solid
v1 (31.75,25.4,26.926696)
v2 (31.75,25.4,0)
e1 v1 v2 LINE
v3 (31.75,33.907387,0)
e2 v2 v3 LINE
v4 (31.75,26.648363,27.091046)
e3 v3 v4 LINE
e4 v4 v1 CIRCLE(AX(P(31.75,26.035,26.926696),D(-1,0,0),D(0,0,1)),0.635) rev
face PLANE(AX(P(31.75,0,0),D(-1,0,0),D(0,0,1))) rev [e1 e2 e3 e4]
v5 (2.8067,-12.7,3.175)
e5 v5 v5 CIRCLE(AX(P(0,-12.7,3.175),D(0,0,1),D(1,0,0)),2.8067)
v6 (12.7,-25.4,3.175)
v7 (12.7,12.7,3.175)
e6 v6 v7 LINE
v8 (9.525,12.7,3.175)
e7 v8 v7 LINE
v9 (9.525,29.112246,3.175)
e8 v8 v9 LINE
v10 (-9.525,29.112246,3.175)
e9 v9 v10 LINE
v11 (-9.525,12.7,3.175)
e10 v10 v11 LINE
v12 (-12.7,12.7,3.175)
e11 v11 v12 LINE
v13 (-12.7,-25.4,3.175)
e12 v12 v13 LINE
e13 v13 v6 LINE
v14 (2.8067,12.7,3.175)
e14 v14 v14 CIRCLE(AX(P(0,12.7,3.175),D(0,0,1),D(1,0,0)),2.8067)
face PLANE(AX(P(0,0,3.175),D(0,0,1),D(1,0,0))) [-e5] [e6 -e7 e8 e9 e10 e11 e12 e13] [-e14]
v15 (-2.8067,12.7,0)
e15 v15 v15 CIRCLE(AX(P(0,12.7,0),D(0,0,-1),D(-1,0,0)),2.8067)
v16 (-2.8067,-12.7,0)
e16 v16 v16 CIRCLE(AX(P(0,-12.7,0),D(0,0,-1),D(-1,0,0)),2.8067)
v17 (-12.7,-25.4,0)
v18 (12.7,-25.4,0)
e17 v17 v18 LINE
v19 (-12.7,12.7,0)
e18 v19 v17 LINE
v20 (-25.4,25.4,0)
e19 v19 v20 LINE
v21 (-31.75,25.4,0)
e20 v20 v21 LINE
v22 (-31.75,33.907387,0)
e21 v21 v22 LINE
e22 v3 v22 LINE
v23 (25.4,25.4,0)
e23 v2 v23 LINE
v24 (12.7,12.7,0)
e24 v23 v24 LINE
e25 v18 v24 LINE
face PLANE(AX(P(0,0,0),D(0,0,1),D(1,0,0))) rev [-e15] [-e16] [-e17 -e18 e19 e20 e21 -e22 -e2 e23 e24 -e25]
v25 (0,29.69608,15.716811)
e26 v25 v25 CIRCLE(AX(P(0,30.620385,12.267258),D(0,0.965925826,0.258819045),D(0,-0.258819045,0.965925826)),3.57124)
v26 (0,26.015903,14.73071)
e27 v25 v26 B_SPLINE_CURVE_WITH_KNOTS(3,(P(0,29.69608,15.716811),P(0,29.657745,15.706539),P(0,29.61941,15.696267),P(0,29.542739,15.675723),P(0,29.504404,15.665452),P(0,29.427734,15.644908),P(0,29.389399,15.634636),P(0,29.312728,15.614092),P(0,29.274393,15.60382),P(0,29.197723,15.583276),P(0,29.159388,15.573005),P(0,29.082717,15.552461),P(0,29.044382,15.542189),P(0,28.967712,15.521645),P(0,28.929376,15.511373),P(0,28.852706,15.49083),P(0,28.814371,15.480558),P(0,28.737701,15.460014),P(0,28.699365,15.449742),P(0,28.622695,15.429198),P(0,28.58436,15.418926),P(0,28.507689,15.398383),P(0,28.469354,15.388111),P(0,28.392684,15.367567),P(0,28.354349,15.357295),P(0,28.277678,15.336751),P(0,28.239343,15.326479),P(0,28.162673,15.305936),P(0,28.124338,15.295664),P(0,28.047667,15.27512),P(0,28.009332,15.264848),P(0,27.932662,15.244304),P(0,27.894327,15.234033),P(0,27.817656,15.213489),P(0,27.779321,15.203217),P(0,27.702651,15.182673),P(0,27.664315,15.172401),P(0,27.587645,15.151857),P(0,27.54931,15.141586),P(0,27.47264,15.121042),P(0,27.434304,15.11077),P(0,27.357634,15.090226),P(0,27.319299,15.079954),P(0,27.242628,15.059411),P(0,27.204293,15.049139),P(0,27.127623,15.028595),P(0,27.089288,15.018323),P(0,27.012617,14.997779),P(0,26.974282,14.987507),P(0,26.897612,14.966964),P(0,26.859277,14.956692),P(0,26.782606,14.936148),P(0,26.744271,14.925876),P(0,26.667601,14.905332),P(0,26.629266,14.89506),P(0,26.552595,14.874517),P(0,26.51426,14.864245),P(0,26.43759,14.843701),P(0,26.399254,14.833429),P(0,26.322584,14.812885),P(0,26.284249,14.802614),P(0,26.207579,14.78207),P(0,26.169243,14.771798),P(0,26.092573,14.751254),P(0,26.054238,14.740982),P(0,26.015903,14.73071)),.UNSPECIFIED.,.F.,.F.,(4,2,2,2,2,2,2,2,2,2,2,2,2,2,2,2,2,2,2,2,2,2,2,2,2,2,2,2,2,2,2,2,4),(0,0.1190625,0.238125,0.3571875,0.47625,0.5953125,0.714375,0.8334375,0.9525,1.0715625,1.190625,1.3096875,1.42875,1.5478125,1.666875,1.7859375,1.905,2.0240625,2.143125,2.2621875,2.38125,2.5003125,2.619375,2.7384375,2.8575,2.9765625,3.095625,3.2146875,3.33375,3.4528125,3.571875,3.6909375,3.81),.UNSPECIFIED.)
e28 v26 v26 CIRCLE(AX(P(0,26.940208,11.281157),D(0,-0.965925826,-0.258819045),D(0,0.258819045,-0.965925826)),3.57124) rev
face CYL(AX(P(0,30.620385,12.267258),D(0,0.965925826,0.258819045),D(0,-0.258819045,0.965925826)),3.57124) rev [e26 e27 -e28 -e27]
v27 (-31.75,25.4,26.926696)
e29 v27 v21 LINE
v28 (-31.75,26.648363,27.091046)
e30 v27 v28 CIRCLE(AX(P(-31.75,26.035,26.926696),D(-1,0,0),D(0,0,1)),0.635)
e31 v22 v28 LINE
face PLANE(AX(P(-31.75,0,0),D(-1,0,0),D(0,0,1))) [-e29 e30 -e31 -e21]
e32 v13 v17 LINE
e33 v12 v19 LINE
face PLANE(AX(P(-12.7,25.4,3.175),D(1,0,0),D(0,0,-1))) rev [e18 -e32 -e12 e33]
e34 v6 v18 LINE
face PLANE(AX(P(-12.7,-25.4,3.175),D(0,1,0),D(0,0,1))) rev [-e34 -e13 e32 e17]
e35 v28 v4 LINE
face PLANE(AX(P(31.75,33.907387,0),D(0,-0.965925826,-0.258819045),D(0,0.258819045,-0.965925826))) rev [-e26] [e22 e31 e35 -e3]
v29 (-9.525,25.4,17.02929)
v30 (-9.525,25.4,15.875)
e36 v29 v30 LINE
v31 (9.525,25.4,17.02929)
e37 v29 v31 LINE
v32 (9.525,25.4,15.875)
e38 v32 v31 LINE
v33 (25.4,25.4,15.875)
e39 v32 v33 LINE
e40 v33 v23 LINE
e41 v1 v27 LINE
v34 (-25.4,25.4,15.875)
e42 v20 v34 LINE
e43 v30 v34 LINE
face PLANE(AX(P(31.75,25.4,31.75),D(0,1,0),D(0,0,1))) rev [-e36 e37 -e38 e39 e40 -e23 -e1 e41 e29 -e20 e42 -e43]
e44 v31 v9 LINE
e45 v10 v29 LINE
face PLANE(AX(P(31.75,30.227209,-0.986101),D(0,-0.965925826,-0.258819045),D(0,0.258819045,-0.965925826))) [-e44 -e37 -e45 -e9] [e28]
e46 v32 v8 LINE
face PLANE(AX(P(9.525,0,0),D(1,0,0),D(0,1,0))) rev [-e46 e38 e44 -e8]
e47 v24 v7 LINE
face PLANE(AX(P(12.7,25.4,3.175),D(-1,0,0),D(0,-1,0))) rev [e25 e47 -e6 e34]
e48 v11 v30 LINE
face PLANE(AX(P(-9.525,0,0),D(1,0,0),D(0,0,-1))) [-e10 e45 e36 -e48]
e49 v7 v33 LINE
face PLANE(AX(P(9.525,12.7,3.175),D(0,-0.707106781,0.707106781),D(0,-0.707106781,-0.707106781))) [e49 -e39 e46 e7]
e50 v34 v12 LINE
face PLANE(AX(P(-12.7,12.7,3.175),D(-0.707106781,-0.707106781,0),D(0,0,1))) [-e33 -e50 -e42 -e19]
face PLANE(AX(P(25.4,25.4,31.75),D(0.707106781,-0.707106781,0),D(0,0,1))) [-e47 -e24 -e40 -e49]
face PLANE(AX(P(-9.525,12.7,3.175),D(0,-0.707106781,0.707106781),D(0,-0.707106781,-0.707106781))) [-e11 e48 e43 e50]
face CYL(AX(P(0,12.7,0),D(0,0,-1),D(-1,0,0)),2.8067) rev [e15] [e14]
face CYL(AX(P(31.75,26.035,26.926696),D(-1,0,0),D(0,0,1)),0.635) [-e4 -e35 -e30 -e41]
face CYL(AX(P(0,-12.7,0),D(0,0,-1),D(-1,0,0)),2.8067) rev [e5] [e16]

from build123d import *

# Parameters (mm, degrees)
SKETCH1_W                       = 25.4
SKETCH1_H                       = 50.8
BOSS_EXTRUDE1_DEPTH             = 3.175
F_10_CLEARANCE_HOLE1_D          = 5.6134
BOSS_EXTRUDE3_DEPTH             = 31.75
CHAMFER2_SIZE                   = 12.7
FILLET2_R                       = 0.635
BOSS_EXTRUDE4_REACH             = 64.331
BOSS_EXTRUDE4_DIRECTION_2_DEPTH = 3.175
BOSS_EXTRUDE5_REACH             = 64.331
BOSS_EXTRUDE5_DIRECTION_2_DEPTH = 3.175
F_1_4_CLEARANCE_HOLE2_REACH     = 70.01
F_1_4_CLEARANCE_HOLE2_BORE_R    = 3.57124
CUT_EXTRUDE1_START              = -9.525
CUT_EXTRUDE1_DEPTH              = 19.05


# Read off the part's stored shape, not the designer's step: Cut-Extrude1
with BuildPart() as part:
    # Sketch1 → Boss-Extrude1 (new body)
    with BuildSketch(Plane.XY):
        Rectangle(SKETCH1_W, SKETCH1_H)
    extrude(amount=BOSS_EXTRUDE1_DEPTH)

    # #10 Clearance Hole1 (through all)
    with Locations(Plane(origin=(0, 0, 0), x_dir=(-1, 0, 0), z_dir=(0, 0, -1))):
        with Locations((0, 12.7), (0, -12.7)):
            Hole(F_10_CLEARANCE_HOLE1_D / 2)

    # Sketch8 → Boss-Extrude3 (add, symmetric)
    with BuildSketch(Plane(origin=(0, 0, 0), x_dir=(0, 0, -1), z_dir=(1, 0, 0))):
        Polygon((0, 33.90738686), (-31.75, 25.4), (0, 25.4), align=None)
    extrude(amount=BOSS_EXTRUDE3_DEPTH, both=True)

    # Chamfer2
    chamfer2_edges = [part.edges().sort_by_distance(p)[0] for p in [
        (-12.7, 25.4, 1.5875),
        (12.7, 25.4, 1.5875),
    ]]
    chamfer(chamfer2_edges, length=CHAMFER2_SIZE)

    # Fillet2
    fillet2_edges = [part.edges().sort_by_distance(p)[0] for p in [
        (0, 25.4, 31.75),
    ]]
    fillet(fillet2_edges, radius=FILLET2_R)

    # Boss-Extrude4: up to this face of the body (flat: up to its plane)
    boss_extrude4_end = Plane(part.part.faces().sort_by_distance((-19.05, 19.05, 1.5875))[0])
    # Sketch14 → Boss-Extrude4 (add, up to the picked face)
    with BuildSketch(Plane.ZY.offset(12.7), mode=Mode.PRIVATE) as boss_extrude4_sk1:
        Polygon((3.175, 12.7), (15.875, 25.4), (3.175, 25.4), align=None)
    boss_extrude4_tool1 = split(extrude(boss_extrude4_sk1.sketch, amount=BOSS_EXTRUDE4_REACH, mode=Mode.PRIVATE), bisect_by=boss_extrude4_end, keep=Keep.BOTH, mode=Mode.PRIVATE)
    add(boss_extrude4_tool1.solids().sort_by(Axis((-12.7, 21.166667, 7.408333), (-1, 0, 0)))[0])

    # Sketch14 → Boss-Extrude4 direction 2 (add)
    with BuildSketch(Plane.ZY.offset(12.7)):
        Polygon((3.175, 12.7), (15.875, 25.4), (3.175, 25.4), align=None)
    extrude(amount=-BOSS_EXTRUDE4_DIRECTION_2_DEPTH)

    # Boss-Extrude5: up to this face of the body (flat: up to its plane)
    boss_extrude5_end = Plane(part.part.faces().sort_by_distance((19.05, 19.05, 1.5875))[0])
    # Sketch15 → Boss-Extrude5 (add, up to the picked face)
    with BuildSketch(Plane(origin=(12.7, 0, 0), x_dir=(0, 0, -1), z_dir=(1, 0, 0)), mode=Mode.PRIVATE) as boss_extrude5_sk1:
        Polygon((-3.175, 12.7), (-15.875, 25.4), (-3.175, 25.4), align=None)
    boss_extrude5_tool1 = split(extrude(boss_extrude5_sk1.sketch, amount=BOSS_EXTRUDE5_REACH, mode=Mode.PRIVATE), bisect_by=boss_extrude5_end, keep=Keep.BOTH, mode=Mode.PRIVATE)
    add(boss_extrude5_tool1.solids().sort_by(Axis((12.7, 21.166667, 7.408333), (1, 0, 0)))[0])

    # Sketch15 → Boss-Extrude5 direction 2 (add)
    with BuildSketch(Plane(origin=(12.7, 0, 0), x_dir=(0, 0, -1), z_dir=(1, 0, 0))):
        Polygon((-3.175, 12.7), (-15.875, 25.4), (-3.175, 25.4), align=None)
    extrude(amount=-BOSS_EXTRUDE5_DIRECTION_2_DEPTH)

    # 1/4 Clearance Hole2 bore → 1/4 Clearance Hole2 (cut, up to next)
    with BuildSketch(Plane(origin=(0, 31.636022628, 8.476846715), x_dir=(1, 0, 0), z_dir=(0, 0.96592582628907, 0.2588190451025146)), mode=Mode.PRIVATE) as f_1_4_clearance_hole2_sk1:
        with Locations((0, -3.924122511)):
            Circle(F_1_4_CLEARANCE_HOLE2_BORE_R)
    f_1_4_clearance_hole2_tool1 = extrude(f_1_4_clearance_hole2_sk1.sketch, amount=-F_1_4_CLEARANCE_HOLE2_REACH, mode=Mode.PRIVATE) & part.part
    add(f_1_4_clearance_hole2_tool1.solids().sort_by_distance((0, 30.620385, 12.267258))[0], mode=Mode.SUBTRACT)

    # Cut-Extrude1 outline → Cut-Extrude1 (cut)
    with BuildSketch(Plane.YZ.offset(CUT_EXTRUDE1_START)):
        Polygon((29.112245926, 3.175), (25.4, 17.029290407), (25.4, 3.175), align=None)
    extrude(amount=CUT_EXTRUDE1_DEPTH, mode=Mode.SUBTRACT)


solid = part.part
